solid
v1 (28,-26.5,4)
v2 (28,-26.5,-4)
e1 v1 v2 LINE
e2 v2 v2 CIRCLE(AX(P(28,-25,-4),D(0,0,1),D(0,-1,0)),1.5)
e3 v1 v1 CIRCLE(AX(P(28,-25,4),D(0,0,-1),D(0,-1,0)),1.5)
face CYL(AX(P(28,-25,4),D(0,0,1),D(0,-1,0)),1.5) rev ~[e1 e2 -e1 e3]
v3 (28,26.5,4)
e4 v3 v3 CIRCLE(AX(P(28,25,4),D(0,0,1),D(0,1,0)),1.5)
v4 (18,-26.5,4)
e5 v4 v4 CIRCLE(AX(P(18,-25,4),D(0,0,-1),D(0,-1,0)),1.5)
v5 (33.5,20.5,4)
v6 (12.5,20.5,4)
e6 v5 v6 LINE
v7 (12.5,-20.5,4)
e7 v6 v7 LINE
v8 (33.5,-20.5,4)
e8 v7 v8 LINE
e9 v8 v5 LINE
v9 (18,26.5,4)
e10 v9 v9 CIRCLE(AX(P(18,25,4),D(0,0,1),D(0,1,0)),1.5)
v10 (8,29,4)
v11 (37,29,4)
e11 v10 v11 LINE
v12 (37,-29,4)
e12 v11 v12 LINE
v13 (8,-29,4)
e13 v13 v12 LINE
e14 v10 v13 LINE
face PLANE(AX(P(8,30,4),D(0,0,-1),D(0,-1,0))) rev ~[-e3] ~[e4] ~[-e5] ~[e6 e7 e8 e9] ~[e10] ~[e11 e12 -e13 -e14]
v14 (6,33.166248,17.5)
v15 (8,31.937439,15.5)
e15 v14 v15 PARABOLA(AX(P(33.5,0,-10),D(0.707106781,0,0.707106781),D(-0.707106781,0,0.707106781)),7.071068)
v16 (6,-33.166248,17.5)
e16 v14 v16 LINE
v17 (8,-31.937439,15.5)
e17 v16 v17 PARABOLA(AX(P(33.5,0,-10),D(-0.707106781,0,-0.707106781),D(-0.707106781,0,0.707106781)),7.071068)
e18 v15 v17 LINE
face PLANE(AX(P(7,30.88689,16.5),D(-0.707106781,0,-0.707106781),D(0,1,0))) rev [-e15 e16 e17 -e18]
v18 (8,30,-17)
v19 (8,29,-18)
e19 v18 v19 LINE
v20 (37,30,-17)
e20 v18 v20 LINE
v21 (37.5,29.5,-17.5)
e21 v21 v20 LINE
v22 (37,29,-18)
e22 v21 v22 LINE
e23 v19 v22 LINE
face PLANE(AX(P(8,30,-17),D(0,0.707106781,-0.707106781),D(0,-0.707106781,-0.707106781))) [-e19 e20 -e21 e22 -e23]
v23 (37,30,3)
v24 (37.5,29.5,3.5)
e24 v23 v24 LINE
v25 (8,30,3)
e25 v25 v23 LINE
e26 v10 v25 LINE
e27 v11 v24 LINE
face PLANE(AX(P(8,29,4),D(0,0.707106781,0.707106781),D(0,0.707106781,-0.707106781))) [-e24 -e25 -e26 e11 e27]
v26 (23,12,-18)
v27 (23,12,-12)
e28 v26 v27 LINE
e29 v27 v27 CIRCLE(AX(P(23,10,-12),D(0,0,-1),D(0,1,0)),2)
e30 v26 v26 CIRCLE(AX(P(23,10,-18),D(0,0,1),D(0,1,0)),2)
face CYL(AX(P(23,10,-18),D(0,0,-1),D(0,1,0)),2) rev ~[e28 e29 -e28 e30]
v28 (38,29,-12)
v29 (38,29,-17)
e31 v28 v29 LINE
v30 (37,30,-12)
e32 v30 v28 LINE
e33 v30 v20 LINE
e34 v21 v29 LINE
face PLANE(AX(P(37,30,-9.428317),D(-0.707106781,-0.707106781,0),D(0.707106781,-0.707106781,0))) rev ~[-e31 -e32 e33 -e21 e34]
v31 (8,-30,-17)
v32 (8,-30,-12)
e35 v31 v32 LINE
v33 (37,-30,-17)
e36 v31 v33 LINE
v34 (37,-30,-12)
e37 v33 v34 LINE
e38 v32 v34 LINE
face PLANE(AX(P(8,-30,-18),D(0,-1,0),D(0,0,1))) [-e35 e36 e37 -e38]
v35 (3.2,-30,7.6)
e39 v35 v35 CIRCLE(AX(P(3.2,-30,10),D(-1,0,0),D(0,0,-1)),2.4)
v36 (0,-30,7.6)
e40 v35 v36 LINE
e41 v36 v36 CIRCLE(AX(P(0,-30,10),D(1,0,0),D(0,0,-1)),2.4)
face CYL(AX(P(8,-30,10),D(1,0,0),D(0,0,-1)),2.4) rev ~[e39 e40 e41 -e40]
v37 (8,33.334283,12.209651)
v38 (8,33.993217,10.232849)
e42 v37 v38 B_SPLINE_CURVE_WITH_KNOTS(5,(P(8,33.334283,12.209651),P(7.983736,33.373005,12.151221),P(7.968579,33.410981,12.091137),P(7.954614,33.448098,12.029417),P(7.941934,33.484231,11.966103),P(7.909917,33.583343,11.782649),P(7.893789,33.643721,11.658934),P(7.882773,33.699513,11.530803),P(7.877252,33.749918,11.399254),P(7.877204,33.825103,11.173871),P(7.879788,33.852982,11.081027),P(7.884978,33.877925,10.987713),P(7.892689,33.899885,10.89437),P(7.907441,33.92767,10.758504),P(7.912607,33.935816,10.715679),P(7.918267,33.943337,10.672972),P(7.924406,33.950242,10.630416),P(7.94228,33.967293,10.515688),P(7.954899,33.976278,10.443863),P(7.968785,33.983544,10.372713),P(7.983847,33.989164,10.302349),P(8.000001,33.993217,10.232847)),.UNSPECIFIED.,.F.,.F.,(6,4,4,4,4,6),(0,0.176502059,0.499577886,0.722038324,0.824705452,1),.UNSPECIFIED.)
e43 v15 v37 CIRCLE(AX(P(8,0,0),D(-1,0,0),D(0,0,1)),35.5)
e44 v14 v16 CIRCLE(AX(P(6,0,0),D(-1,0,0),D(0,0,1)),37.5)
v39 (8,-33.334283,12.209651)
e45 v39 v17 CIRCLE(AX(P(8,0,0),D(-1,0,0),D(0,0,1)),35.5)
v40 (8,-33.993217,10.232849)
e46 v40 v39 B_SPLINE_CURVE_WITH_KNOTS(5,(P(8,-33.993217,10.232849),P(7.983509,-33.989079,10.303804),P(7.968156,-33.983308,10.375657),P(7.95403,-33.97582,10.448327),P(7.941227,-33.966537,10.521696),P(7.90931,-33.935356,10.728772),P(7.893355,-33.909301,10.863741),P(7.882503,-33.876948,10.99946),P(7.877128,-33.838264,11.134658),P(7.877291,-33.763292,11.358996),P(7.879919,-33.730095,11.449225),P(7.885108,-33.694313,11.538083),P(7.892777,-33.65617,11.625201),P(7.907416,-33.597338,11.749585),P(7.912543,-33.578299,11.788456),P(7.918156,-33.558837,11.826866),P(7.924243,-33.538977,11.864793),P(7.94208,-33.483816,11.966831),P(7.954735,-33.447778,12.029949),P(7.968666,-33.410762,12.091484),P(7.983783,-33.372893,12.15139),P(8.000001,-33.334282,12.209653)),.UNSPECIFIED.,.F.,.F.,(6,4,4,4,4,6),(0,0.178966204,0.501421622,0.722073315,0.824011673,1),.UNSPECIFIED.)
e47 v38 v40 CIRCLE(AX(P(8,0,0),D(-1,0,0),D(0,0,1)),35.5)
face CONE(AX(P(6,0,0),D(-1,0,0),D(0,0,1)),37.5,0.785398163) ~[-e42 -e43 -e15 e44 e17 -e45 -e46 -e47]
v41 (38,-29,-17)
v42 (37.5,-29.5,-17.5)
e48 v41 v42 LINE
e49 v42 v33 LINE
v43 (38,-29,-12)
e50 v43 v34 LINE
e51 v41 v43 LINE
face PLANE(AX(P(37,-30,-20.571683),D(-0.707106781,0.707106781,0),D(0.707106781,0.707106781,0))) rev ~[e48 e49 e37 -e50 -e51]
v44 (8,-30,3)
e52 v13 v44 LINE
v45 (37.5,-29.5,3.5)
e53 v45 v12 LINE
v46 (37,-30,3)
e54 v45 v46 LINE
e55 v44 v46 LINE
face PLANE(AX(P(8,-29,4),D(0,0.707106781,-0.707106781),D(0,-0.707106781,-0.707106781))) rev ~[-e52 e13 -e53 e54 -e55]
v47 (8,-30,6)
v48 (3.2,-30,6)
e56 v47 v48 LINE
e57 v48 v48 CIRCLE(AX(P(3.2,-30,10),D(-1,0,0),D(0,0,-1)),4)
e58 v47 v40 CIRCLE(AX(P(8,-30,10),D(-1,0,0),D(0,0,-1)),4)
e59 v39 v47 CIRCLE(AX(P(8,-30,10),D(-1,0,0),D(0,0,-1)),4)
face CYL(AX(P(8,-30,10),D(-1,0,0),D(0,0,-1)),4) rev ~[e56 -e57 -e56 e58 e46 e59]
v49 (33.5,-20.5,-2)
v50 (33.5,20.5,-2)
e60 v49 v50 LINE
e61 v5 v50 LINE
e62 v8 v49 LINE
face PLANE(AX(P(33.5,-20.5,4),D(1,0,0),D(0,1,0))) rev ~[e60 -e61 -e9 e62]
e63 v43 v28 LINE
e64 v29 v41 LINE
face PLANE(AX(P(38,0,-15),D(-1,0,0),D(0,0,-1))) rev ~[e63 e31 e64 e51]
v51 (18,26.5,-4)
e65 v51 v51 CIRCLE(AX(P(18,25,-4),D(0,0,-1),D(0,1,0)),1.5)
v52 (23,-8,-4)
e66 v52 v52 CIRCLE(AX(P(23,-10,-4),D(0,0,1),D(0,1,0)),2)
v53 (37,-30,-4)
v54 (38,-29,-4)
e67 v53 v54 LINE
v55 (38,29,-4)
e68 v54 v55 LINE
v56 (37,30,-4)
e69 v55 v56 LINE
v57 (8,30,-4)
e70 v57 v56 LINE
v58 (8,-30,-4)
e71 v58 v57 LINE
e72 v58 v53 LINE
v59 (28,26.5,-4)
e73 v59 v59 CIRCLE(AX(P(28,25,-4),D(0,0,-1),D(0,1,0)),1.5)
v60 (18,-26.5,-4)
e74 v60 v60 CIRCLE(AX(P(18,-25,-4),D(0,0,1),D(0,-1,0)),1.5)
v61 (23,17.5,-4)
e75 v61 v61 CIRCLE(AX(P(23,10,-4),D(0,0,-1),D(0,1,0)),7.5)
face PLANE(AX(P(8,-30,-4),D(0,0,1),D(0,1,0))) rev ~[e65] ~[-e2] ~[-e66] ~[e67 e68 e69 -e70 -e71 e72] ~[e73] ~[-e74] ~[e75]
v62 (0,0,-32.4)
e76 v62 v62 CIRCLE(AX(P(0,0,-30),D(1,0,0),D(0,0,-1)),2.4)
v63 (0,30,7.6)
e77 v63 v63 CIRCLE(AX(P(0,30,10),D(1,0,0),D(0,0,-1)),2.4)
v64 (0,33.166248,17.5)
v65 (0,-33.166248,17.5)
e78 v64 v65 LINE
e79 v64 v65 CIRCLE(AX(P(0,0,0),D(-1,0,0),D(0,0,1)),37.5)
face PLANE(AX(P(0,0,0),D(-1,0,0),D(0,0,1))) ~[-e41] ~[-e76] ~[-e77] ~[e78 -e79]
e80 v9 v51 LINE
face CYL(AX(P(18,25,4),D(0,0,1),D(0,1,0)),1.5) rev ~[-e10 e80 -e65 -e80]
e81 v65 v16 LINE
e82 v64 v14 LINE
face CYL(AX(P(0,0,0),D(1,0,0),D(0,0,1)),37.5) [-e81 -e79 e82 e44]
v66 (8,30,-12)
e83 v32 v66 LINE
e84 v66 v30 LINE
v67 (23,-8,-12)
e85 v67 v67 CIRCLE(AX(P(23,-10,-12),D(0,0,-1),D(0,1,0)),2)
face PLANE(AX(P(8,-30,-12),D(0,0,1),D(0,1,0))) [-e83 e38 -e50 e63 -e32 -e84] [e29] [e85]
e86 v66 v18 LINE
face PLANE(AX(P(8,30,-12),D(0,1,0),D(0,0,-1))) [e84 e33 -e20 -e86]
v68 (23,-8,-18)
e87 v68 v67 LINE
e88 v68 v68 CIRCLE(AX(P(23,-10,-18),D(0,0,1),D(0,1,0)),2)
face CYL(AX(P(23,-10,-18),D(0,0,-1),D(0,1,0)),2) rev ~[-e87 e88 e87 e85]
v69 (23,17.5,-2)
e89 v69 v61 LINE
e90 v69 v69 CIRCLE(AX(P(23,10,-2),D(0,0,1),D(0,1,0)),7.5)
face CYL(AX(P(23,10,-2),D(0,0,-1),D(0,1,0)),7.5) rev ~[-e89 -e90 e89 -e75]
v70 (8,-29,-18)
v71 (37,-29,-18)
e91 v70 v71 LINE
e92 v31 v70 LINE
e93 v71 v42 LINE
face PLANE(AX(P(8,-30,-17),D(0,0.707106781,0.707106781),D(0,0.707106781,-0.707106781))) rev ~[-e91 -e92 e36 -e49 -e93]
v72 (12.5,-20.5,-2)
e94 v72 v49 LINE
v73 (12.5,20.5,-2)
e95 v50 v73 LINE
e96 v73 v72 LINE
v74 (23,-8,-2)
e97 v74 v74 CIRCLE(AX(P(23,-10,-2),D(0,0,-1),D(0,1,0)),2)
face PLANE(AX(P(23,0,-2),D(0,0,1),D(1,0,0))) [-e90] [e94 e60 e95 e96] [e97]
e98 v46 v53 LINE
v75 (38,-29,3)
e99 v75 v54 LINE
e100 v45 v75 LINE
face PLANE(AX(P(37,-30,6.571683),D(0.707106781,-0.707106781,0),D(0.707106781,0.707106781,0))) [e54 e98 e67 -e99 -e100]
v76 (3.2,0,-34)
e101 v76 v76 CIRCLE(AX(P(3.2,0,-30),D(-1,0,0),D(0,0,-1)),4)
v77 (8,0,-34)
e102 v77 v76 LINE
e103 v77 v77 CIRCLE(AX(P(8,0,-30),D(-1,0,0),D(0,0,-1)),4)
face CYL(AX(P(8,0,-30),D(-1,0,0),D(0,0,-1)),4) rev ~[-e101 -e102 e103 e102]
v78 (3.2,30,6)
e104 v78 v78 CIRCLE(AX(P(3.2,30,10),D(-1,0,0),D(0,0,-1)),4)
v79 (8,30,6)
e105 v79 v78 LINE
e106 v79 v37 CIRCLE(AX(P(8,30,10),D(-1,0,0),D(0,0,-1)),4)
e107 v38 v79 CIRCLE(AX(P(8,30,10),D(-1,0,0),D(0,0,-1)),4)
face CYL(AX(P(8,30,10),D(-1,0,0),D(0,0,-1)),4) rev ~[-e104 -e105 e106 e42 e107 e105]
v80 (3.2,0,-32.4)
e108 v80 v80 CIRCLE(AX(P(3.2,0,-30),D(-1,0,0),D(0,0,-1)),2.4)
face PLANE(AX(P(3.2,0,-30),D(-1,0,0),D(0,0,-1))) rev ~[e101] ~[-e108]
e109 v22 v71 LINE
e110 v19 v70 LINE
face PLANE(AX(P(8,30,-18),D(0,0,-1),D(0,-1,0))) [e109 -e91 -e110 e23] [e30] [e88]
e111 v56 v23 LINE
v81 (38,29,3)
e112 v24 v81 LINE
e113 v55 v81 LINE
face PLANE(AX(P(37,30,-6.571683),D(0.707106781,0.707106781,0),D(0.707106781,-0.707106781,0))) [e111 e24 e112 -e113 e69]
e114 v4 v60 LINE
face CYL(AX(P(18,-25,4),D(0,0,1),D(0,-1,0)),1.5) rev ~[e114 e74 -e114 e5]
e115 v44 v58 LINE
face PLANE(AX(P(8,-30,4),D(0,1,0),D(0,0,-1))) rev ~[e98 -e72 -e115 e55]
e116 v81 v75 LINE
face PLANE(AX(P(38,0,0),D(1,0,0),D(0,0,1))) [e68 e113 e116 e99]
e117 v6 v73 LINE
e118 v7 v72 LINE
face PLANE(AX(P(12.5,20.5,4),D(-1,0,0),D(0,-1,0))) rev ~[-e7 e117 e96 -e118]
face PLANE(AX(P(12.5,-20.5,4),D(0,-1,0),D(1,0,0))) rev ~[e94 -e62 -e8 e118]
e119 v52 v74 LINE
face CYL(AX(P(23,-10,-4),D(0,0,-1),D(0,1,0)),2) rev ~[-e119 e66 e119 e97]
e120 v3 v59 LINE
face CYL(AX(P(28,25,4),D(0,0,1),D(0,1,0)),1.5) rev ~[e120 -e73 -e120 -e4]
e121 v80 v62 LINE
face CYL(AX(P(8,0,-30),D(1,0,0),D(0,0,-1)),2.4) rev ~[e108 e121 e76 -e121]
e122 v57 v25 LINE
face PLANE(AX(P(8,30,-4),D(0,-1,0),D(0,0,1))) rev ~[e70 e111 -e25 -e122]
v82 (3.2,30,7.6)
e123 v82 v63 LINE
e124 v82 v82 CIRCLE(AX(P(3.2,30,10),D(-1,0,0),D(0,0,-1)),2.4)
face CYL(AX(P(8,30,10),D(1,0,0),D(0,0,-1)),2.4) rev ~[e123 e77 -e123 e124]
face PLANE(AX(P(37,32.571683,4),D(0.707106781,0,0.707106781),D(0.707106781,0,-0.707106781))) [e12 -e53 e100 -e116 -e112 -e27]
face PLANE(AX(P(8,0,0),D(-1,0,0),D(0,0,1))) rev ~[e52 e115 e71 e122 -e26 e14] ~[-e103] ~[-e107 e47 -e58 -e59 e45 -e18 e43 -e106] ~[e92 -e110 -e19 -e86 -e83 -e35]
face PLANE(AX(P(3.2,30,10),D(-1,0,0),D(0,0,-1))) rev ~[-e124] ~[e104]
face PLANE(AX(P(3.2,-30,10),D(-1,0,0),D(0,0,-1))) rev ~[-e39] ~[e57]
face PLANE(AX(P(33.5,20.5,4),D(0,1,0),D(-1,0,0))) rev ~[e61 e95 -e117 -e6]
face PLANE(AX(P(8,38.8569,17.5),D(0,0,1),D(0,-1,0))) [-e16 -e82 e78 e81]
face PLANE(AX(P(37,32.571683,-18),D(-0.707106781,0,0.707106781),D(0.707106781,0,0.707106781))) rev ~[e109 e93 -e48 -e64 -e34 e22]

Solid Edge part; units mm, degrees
sketch "Sketch1" plane through (0, 0, 0) normal (0, -1, 0) x (1, 0, 0)
  line L0 (0, 0) -> (0, 37.5)
  line L1 (0, 37.5) -> (6, 37.5)
  line L2 (6, 37.5) -> (8, 35.5)
  line L3 (8, 35.5) -> (8, 0)
  dimension "D1" = 8
  dimension "D2" = 2
revolve "RevolvedProtrusion1" add sketch "Sketch1" angle 360 about axis through (12, 0, 0) along (-1, 0, 0)
sketch "Sketch2" plane through (8, 0, 0) normal (1, 0, 0) x (0, 1, 0)
  line L0 (-30, 4) -> (-30, -4)
  line L1 (-30, -4) -> (30, -4)
  line L2 (30, -4) -> (30, 4)
  line L3 (30, 4) -> (-30, 4)
  line L4 (-30, -12) -> (30, -12)
  line L5 (30, -12) -> (30, -18)
  line L6 (30, -18) -> (-30, -18)
  line L7 (-30, -18) -> (-30, -12)
  dimension "D1" = 8
  dimension "D2" = 6
  dimension "D3" = 8
  dimension "D4" = 4
  dimension "D5" = 60
extrude "Protrusion1" add sketch "Sketch2" along normal blind 30
sketch "Sketch3" plane through (25, 0, 4) normal (0, 0, 1) x (0, 1, 0)
  line L0 (-20.5, -8.5) -> (20.5, -8.5)
  line L1 (20.5, -8.5) -> (20.5, 12.5)
  line L2 (20.5, 12.5) -> (-20.5, 12.5)
  line L3 (-20.5, 12.5) -> (-20.5, -8.5)
  dimension "D1" = 21
  dimension "D2" = 41
extrude "ExtrudedCutout_1" cut sketch "Sketch3" against normal blind 6
hole "Hole_1" at (23, -10, -18) direction (0, 0, 1) diameter 4 end up to next
hole "Hole1" at (23, 10, -18) direction (0, 0, 1) diameter 4 end up to next
sketch "Sketch4" plane through (23, 0, 4) normal (1, 0, 0) x (0, 1, 0)
  line L0 (10, -6) -> (17.5, -6)
  line L1 (17.5, -6) -> (17.5, -8.5)
  line L2 (17.5, -8.5) -> (14, -8.5)
  line L3 (14, -8.5) -> (14, -8)
  line L4 (14, -8) -> (10, -8)
  dimension "D1" = 10
  dimension "D2" = 2.5
  dimension "D3" = 2
revolve "RevolvedCutout1" cut sketch "Sketch4" angle 360 about axis through (23, 10, -2) along (0, 0, 1)
hole "Hole_3" at (18, -25, 4) direction (0, 0, -1) diameter 3 end up to next
hole "Hole2" at (28, -25, 4) direction (0, 0, -1) diameter 3 end up to next
hole "Hole_5" at (8, 0, -30) direction (-1, 0, 0) diameter 4.8 end up to next counterbore diameter 8 counterbore depth 4.8
hole "Hole3" at (8, -30, 10) direction (-1, 0, 0) diameter 4.8 end up to next counterbore diameter 8 counterbore depth 4.8
hole "Hole4" at (8, 30, 10) direction (-1, 0, 0) diameter 4.8 end up to next counterbore diameter 8 counterbore depth 4.8
sketch "Sketch5" plane through (8, 0, 20.75) normal (1, 0, 0) x (0, 1, 0)
  line L0 (-38.8569, 19.7387) -> (38.8569, 19.7387)
  line L1 (38.8569, 19.7387) -> (38.8569, -3.25)
  line L2 (38.8569, -3.25) -> (-38.8569, -3.25)
  line L3 (-38.8569, -3.25) -> (-38.8569, 19.7387)
  dimension "D1" = 17.5
extrude "ExtrudedCutout_2" cut sketch "Sketch5" against normal blind 180
chamfer "Chamfer_1" distance 2 angle 45 1 edges at (8, 0, 17.5)
chamfer "Chamfer_2" distance 1 angle 45 10 edges at (23, -30, -18) (38, 0, -18) (23, 30, -18) (38, 30, -15) (38, 30, 0) (23, 30, 4) (38, 0, 4) (23, -30, 4) (38, -30, 0) (38, -30, -15)
hole "Hole_10" at (23, -10, -4) direction (0, 0, 1) diameter 4 end up to next
mirror "Mirror1" about plane through (0, 0, 0) normal (0, -1, 0) of "Hole_3", "Hole2"
properties material "Polyethylene, low density"
